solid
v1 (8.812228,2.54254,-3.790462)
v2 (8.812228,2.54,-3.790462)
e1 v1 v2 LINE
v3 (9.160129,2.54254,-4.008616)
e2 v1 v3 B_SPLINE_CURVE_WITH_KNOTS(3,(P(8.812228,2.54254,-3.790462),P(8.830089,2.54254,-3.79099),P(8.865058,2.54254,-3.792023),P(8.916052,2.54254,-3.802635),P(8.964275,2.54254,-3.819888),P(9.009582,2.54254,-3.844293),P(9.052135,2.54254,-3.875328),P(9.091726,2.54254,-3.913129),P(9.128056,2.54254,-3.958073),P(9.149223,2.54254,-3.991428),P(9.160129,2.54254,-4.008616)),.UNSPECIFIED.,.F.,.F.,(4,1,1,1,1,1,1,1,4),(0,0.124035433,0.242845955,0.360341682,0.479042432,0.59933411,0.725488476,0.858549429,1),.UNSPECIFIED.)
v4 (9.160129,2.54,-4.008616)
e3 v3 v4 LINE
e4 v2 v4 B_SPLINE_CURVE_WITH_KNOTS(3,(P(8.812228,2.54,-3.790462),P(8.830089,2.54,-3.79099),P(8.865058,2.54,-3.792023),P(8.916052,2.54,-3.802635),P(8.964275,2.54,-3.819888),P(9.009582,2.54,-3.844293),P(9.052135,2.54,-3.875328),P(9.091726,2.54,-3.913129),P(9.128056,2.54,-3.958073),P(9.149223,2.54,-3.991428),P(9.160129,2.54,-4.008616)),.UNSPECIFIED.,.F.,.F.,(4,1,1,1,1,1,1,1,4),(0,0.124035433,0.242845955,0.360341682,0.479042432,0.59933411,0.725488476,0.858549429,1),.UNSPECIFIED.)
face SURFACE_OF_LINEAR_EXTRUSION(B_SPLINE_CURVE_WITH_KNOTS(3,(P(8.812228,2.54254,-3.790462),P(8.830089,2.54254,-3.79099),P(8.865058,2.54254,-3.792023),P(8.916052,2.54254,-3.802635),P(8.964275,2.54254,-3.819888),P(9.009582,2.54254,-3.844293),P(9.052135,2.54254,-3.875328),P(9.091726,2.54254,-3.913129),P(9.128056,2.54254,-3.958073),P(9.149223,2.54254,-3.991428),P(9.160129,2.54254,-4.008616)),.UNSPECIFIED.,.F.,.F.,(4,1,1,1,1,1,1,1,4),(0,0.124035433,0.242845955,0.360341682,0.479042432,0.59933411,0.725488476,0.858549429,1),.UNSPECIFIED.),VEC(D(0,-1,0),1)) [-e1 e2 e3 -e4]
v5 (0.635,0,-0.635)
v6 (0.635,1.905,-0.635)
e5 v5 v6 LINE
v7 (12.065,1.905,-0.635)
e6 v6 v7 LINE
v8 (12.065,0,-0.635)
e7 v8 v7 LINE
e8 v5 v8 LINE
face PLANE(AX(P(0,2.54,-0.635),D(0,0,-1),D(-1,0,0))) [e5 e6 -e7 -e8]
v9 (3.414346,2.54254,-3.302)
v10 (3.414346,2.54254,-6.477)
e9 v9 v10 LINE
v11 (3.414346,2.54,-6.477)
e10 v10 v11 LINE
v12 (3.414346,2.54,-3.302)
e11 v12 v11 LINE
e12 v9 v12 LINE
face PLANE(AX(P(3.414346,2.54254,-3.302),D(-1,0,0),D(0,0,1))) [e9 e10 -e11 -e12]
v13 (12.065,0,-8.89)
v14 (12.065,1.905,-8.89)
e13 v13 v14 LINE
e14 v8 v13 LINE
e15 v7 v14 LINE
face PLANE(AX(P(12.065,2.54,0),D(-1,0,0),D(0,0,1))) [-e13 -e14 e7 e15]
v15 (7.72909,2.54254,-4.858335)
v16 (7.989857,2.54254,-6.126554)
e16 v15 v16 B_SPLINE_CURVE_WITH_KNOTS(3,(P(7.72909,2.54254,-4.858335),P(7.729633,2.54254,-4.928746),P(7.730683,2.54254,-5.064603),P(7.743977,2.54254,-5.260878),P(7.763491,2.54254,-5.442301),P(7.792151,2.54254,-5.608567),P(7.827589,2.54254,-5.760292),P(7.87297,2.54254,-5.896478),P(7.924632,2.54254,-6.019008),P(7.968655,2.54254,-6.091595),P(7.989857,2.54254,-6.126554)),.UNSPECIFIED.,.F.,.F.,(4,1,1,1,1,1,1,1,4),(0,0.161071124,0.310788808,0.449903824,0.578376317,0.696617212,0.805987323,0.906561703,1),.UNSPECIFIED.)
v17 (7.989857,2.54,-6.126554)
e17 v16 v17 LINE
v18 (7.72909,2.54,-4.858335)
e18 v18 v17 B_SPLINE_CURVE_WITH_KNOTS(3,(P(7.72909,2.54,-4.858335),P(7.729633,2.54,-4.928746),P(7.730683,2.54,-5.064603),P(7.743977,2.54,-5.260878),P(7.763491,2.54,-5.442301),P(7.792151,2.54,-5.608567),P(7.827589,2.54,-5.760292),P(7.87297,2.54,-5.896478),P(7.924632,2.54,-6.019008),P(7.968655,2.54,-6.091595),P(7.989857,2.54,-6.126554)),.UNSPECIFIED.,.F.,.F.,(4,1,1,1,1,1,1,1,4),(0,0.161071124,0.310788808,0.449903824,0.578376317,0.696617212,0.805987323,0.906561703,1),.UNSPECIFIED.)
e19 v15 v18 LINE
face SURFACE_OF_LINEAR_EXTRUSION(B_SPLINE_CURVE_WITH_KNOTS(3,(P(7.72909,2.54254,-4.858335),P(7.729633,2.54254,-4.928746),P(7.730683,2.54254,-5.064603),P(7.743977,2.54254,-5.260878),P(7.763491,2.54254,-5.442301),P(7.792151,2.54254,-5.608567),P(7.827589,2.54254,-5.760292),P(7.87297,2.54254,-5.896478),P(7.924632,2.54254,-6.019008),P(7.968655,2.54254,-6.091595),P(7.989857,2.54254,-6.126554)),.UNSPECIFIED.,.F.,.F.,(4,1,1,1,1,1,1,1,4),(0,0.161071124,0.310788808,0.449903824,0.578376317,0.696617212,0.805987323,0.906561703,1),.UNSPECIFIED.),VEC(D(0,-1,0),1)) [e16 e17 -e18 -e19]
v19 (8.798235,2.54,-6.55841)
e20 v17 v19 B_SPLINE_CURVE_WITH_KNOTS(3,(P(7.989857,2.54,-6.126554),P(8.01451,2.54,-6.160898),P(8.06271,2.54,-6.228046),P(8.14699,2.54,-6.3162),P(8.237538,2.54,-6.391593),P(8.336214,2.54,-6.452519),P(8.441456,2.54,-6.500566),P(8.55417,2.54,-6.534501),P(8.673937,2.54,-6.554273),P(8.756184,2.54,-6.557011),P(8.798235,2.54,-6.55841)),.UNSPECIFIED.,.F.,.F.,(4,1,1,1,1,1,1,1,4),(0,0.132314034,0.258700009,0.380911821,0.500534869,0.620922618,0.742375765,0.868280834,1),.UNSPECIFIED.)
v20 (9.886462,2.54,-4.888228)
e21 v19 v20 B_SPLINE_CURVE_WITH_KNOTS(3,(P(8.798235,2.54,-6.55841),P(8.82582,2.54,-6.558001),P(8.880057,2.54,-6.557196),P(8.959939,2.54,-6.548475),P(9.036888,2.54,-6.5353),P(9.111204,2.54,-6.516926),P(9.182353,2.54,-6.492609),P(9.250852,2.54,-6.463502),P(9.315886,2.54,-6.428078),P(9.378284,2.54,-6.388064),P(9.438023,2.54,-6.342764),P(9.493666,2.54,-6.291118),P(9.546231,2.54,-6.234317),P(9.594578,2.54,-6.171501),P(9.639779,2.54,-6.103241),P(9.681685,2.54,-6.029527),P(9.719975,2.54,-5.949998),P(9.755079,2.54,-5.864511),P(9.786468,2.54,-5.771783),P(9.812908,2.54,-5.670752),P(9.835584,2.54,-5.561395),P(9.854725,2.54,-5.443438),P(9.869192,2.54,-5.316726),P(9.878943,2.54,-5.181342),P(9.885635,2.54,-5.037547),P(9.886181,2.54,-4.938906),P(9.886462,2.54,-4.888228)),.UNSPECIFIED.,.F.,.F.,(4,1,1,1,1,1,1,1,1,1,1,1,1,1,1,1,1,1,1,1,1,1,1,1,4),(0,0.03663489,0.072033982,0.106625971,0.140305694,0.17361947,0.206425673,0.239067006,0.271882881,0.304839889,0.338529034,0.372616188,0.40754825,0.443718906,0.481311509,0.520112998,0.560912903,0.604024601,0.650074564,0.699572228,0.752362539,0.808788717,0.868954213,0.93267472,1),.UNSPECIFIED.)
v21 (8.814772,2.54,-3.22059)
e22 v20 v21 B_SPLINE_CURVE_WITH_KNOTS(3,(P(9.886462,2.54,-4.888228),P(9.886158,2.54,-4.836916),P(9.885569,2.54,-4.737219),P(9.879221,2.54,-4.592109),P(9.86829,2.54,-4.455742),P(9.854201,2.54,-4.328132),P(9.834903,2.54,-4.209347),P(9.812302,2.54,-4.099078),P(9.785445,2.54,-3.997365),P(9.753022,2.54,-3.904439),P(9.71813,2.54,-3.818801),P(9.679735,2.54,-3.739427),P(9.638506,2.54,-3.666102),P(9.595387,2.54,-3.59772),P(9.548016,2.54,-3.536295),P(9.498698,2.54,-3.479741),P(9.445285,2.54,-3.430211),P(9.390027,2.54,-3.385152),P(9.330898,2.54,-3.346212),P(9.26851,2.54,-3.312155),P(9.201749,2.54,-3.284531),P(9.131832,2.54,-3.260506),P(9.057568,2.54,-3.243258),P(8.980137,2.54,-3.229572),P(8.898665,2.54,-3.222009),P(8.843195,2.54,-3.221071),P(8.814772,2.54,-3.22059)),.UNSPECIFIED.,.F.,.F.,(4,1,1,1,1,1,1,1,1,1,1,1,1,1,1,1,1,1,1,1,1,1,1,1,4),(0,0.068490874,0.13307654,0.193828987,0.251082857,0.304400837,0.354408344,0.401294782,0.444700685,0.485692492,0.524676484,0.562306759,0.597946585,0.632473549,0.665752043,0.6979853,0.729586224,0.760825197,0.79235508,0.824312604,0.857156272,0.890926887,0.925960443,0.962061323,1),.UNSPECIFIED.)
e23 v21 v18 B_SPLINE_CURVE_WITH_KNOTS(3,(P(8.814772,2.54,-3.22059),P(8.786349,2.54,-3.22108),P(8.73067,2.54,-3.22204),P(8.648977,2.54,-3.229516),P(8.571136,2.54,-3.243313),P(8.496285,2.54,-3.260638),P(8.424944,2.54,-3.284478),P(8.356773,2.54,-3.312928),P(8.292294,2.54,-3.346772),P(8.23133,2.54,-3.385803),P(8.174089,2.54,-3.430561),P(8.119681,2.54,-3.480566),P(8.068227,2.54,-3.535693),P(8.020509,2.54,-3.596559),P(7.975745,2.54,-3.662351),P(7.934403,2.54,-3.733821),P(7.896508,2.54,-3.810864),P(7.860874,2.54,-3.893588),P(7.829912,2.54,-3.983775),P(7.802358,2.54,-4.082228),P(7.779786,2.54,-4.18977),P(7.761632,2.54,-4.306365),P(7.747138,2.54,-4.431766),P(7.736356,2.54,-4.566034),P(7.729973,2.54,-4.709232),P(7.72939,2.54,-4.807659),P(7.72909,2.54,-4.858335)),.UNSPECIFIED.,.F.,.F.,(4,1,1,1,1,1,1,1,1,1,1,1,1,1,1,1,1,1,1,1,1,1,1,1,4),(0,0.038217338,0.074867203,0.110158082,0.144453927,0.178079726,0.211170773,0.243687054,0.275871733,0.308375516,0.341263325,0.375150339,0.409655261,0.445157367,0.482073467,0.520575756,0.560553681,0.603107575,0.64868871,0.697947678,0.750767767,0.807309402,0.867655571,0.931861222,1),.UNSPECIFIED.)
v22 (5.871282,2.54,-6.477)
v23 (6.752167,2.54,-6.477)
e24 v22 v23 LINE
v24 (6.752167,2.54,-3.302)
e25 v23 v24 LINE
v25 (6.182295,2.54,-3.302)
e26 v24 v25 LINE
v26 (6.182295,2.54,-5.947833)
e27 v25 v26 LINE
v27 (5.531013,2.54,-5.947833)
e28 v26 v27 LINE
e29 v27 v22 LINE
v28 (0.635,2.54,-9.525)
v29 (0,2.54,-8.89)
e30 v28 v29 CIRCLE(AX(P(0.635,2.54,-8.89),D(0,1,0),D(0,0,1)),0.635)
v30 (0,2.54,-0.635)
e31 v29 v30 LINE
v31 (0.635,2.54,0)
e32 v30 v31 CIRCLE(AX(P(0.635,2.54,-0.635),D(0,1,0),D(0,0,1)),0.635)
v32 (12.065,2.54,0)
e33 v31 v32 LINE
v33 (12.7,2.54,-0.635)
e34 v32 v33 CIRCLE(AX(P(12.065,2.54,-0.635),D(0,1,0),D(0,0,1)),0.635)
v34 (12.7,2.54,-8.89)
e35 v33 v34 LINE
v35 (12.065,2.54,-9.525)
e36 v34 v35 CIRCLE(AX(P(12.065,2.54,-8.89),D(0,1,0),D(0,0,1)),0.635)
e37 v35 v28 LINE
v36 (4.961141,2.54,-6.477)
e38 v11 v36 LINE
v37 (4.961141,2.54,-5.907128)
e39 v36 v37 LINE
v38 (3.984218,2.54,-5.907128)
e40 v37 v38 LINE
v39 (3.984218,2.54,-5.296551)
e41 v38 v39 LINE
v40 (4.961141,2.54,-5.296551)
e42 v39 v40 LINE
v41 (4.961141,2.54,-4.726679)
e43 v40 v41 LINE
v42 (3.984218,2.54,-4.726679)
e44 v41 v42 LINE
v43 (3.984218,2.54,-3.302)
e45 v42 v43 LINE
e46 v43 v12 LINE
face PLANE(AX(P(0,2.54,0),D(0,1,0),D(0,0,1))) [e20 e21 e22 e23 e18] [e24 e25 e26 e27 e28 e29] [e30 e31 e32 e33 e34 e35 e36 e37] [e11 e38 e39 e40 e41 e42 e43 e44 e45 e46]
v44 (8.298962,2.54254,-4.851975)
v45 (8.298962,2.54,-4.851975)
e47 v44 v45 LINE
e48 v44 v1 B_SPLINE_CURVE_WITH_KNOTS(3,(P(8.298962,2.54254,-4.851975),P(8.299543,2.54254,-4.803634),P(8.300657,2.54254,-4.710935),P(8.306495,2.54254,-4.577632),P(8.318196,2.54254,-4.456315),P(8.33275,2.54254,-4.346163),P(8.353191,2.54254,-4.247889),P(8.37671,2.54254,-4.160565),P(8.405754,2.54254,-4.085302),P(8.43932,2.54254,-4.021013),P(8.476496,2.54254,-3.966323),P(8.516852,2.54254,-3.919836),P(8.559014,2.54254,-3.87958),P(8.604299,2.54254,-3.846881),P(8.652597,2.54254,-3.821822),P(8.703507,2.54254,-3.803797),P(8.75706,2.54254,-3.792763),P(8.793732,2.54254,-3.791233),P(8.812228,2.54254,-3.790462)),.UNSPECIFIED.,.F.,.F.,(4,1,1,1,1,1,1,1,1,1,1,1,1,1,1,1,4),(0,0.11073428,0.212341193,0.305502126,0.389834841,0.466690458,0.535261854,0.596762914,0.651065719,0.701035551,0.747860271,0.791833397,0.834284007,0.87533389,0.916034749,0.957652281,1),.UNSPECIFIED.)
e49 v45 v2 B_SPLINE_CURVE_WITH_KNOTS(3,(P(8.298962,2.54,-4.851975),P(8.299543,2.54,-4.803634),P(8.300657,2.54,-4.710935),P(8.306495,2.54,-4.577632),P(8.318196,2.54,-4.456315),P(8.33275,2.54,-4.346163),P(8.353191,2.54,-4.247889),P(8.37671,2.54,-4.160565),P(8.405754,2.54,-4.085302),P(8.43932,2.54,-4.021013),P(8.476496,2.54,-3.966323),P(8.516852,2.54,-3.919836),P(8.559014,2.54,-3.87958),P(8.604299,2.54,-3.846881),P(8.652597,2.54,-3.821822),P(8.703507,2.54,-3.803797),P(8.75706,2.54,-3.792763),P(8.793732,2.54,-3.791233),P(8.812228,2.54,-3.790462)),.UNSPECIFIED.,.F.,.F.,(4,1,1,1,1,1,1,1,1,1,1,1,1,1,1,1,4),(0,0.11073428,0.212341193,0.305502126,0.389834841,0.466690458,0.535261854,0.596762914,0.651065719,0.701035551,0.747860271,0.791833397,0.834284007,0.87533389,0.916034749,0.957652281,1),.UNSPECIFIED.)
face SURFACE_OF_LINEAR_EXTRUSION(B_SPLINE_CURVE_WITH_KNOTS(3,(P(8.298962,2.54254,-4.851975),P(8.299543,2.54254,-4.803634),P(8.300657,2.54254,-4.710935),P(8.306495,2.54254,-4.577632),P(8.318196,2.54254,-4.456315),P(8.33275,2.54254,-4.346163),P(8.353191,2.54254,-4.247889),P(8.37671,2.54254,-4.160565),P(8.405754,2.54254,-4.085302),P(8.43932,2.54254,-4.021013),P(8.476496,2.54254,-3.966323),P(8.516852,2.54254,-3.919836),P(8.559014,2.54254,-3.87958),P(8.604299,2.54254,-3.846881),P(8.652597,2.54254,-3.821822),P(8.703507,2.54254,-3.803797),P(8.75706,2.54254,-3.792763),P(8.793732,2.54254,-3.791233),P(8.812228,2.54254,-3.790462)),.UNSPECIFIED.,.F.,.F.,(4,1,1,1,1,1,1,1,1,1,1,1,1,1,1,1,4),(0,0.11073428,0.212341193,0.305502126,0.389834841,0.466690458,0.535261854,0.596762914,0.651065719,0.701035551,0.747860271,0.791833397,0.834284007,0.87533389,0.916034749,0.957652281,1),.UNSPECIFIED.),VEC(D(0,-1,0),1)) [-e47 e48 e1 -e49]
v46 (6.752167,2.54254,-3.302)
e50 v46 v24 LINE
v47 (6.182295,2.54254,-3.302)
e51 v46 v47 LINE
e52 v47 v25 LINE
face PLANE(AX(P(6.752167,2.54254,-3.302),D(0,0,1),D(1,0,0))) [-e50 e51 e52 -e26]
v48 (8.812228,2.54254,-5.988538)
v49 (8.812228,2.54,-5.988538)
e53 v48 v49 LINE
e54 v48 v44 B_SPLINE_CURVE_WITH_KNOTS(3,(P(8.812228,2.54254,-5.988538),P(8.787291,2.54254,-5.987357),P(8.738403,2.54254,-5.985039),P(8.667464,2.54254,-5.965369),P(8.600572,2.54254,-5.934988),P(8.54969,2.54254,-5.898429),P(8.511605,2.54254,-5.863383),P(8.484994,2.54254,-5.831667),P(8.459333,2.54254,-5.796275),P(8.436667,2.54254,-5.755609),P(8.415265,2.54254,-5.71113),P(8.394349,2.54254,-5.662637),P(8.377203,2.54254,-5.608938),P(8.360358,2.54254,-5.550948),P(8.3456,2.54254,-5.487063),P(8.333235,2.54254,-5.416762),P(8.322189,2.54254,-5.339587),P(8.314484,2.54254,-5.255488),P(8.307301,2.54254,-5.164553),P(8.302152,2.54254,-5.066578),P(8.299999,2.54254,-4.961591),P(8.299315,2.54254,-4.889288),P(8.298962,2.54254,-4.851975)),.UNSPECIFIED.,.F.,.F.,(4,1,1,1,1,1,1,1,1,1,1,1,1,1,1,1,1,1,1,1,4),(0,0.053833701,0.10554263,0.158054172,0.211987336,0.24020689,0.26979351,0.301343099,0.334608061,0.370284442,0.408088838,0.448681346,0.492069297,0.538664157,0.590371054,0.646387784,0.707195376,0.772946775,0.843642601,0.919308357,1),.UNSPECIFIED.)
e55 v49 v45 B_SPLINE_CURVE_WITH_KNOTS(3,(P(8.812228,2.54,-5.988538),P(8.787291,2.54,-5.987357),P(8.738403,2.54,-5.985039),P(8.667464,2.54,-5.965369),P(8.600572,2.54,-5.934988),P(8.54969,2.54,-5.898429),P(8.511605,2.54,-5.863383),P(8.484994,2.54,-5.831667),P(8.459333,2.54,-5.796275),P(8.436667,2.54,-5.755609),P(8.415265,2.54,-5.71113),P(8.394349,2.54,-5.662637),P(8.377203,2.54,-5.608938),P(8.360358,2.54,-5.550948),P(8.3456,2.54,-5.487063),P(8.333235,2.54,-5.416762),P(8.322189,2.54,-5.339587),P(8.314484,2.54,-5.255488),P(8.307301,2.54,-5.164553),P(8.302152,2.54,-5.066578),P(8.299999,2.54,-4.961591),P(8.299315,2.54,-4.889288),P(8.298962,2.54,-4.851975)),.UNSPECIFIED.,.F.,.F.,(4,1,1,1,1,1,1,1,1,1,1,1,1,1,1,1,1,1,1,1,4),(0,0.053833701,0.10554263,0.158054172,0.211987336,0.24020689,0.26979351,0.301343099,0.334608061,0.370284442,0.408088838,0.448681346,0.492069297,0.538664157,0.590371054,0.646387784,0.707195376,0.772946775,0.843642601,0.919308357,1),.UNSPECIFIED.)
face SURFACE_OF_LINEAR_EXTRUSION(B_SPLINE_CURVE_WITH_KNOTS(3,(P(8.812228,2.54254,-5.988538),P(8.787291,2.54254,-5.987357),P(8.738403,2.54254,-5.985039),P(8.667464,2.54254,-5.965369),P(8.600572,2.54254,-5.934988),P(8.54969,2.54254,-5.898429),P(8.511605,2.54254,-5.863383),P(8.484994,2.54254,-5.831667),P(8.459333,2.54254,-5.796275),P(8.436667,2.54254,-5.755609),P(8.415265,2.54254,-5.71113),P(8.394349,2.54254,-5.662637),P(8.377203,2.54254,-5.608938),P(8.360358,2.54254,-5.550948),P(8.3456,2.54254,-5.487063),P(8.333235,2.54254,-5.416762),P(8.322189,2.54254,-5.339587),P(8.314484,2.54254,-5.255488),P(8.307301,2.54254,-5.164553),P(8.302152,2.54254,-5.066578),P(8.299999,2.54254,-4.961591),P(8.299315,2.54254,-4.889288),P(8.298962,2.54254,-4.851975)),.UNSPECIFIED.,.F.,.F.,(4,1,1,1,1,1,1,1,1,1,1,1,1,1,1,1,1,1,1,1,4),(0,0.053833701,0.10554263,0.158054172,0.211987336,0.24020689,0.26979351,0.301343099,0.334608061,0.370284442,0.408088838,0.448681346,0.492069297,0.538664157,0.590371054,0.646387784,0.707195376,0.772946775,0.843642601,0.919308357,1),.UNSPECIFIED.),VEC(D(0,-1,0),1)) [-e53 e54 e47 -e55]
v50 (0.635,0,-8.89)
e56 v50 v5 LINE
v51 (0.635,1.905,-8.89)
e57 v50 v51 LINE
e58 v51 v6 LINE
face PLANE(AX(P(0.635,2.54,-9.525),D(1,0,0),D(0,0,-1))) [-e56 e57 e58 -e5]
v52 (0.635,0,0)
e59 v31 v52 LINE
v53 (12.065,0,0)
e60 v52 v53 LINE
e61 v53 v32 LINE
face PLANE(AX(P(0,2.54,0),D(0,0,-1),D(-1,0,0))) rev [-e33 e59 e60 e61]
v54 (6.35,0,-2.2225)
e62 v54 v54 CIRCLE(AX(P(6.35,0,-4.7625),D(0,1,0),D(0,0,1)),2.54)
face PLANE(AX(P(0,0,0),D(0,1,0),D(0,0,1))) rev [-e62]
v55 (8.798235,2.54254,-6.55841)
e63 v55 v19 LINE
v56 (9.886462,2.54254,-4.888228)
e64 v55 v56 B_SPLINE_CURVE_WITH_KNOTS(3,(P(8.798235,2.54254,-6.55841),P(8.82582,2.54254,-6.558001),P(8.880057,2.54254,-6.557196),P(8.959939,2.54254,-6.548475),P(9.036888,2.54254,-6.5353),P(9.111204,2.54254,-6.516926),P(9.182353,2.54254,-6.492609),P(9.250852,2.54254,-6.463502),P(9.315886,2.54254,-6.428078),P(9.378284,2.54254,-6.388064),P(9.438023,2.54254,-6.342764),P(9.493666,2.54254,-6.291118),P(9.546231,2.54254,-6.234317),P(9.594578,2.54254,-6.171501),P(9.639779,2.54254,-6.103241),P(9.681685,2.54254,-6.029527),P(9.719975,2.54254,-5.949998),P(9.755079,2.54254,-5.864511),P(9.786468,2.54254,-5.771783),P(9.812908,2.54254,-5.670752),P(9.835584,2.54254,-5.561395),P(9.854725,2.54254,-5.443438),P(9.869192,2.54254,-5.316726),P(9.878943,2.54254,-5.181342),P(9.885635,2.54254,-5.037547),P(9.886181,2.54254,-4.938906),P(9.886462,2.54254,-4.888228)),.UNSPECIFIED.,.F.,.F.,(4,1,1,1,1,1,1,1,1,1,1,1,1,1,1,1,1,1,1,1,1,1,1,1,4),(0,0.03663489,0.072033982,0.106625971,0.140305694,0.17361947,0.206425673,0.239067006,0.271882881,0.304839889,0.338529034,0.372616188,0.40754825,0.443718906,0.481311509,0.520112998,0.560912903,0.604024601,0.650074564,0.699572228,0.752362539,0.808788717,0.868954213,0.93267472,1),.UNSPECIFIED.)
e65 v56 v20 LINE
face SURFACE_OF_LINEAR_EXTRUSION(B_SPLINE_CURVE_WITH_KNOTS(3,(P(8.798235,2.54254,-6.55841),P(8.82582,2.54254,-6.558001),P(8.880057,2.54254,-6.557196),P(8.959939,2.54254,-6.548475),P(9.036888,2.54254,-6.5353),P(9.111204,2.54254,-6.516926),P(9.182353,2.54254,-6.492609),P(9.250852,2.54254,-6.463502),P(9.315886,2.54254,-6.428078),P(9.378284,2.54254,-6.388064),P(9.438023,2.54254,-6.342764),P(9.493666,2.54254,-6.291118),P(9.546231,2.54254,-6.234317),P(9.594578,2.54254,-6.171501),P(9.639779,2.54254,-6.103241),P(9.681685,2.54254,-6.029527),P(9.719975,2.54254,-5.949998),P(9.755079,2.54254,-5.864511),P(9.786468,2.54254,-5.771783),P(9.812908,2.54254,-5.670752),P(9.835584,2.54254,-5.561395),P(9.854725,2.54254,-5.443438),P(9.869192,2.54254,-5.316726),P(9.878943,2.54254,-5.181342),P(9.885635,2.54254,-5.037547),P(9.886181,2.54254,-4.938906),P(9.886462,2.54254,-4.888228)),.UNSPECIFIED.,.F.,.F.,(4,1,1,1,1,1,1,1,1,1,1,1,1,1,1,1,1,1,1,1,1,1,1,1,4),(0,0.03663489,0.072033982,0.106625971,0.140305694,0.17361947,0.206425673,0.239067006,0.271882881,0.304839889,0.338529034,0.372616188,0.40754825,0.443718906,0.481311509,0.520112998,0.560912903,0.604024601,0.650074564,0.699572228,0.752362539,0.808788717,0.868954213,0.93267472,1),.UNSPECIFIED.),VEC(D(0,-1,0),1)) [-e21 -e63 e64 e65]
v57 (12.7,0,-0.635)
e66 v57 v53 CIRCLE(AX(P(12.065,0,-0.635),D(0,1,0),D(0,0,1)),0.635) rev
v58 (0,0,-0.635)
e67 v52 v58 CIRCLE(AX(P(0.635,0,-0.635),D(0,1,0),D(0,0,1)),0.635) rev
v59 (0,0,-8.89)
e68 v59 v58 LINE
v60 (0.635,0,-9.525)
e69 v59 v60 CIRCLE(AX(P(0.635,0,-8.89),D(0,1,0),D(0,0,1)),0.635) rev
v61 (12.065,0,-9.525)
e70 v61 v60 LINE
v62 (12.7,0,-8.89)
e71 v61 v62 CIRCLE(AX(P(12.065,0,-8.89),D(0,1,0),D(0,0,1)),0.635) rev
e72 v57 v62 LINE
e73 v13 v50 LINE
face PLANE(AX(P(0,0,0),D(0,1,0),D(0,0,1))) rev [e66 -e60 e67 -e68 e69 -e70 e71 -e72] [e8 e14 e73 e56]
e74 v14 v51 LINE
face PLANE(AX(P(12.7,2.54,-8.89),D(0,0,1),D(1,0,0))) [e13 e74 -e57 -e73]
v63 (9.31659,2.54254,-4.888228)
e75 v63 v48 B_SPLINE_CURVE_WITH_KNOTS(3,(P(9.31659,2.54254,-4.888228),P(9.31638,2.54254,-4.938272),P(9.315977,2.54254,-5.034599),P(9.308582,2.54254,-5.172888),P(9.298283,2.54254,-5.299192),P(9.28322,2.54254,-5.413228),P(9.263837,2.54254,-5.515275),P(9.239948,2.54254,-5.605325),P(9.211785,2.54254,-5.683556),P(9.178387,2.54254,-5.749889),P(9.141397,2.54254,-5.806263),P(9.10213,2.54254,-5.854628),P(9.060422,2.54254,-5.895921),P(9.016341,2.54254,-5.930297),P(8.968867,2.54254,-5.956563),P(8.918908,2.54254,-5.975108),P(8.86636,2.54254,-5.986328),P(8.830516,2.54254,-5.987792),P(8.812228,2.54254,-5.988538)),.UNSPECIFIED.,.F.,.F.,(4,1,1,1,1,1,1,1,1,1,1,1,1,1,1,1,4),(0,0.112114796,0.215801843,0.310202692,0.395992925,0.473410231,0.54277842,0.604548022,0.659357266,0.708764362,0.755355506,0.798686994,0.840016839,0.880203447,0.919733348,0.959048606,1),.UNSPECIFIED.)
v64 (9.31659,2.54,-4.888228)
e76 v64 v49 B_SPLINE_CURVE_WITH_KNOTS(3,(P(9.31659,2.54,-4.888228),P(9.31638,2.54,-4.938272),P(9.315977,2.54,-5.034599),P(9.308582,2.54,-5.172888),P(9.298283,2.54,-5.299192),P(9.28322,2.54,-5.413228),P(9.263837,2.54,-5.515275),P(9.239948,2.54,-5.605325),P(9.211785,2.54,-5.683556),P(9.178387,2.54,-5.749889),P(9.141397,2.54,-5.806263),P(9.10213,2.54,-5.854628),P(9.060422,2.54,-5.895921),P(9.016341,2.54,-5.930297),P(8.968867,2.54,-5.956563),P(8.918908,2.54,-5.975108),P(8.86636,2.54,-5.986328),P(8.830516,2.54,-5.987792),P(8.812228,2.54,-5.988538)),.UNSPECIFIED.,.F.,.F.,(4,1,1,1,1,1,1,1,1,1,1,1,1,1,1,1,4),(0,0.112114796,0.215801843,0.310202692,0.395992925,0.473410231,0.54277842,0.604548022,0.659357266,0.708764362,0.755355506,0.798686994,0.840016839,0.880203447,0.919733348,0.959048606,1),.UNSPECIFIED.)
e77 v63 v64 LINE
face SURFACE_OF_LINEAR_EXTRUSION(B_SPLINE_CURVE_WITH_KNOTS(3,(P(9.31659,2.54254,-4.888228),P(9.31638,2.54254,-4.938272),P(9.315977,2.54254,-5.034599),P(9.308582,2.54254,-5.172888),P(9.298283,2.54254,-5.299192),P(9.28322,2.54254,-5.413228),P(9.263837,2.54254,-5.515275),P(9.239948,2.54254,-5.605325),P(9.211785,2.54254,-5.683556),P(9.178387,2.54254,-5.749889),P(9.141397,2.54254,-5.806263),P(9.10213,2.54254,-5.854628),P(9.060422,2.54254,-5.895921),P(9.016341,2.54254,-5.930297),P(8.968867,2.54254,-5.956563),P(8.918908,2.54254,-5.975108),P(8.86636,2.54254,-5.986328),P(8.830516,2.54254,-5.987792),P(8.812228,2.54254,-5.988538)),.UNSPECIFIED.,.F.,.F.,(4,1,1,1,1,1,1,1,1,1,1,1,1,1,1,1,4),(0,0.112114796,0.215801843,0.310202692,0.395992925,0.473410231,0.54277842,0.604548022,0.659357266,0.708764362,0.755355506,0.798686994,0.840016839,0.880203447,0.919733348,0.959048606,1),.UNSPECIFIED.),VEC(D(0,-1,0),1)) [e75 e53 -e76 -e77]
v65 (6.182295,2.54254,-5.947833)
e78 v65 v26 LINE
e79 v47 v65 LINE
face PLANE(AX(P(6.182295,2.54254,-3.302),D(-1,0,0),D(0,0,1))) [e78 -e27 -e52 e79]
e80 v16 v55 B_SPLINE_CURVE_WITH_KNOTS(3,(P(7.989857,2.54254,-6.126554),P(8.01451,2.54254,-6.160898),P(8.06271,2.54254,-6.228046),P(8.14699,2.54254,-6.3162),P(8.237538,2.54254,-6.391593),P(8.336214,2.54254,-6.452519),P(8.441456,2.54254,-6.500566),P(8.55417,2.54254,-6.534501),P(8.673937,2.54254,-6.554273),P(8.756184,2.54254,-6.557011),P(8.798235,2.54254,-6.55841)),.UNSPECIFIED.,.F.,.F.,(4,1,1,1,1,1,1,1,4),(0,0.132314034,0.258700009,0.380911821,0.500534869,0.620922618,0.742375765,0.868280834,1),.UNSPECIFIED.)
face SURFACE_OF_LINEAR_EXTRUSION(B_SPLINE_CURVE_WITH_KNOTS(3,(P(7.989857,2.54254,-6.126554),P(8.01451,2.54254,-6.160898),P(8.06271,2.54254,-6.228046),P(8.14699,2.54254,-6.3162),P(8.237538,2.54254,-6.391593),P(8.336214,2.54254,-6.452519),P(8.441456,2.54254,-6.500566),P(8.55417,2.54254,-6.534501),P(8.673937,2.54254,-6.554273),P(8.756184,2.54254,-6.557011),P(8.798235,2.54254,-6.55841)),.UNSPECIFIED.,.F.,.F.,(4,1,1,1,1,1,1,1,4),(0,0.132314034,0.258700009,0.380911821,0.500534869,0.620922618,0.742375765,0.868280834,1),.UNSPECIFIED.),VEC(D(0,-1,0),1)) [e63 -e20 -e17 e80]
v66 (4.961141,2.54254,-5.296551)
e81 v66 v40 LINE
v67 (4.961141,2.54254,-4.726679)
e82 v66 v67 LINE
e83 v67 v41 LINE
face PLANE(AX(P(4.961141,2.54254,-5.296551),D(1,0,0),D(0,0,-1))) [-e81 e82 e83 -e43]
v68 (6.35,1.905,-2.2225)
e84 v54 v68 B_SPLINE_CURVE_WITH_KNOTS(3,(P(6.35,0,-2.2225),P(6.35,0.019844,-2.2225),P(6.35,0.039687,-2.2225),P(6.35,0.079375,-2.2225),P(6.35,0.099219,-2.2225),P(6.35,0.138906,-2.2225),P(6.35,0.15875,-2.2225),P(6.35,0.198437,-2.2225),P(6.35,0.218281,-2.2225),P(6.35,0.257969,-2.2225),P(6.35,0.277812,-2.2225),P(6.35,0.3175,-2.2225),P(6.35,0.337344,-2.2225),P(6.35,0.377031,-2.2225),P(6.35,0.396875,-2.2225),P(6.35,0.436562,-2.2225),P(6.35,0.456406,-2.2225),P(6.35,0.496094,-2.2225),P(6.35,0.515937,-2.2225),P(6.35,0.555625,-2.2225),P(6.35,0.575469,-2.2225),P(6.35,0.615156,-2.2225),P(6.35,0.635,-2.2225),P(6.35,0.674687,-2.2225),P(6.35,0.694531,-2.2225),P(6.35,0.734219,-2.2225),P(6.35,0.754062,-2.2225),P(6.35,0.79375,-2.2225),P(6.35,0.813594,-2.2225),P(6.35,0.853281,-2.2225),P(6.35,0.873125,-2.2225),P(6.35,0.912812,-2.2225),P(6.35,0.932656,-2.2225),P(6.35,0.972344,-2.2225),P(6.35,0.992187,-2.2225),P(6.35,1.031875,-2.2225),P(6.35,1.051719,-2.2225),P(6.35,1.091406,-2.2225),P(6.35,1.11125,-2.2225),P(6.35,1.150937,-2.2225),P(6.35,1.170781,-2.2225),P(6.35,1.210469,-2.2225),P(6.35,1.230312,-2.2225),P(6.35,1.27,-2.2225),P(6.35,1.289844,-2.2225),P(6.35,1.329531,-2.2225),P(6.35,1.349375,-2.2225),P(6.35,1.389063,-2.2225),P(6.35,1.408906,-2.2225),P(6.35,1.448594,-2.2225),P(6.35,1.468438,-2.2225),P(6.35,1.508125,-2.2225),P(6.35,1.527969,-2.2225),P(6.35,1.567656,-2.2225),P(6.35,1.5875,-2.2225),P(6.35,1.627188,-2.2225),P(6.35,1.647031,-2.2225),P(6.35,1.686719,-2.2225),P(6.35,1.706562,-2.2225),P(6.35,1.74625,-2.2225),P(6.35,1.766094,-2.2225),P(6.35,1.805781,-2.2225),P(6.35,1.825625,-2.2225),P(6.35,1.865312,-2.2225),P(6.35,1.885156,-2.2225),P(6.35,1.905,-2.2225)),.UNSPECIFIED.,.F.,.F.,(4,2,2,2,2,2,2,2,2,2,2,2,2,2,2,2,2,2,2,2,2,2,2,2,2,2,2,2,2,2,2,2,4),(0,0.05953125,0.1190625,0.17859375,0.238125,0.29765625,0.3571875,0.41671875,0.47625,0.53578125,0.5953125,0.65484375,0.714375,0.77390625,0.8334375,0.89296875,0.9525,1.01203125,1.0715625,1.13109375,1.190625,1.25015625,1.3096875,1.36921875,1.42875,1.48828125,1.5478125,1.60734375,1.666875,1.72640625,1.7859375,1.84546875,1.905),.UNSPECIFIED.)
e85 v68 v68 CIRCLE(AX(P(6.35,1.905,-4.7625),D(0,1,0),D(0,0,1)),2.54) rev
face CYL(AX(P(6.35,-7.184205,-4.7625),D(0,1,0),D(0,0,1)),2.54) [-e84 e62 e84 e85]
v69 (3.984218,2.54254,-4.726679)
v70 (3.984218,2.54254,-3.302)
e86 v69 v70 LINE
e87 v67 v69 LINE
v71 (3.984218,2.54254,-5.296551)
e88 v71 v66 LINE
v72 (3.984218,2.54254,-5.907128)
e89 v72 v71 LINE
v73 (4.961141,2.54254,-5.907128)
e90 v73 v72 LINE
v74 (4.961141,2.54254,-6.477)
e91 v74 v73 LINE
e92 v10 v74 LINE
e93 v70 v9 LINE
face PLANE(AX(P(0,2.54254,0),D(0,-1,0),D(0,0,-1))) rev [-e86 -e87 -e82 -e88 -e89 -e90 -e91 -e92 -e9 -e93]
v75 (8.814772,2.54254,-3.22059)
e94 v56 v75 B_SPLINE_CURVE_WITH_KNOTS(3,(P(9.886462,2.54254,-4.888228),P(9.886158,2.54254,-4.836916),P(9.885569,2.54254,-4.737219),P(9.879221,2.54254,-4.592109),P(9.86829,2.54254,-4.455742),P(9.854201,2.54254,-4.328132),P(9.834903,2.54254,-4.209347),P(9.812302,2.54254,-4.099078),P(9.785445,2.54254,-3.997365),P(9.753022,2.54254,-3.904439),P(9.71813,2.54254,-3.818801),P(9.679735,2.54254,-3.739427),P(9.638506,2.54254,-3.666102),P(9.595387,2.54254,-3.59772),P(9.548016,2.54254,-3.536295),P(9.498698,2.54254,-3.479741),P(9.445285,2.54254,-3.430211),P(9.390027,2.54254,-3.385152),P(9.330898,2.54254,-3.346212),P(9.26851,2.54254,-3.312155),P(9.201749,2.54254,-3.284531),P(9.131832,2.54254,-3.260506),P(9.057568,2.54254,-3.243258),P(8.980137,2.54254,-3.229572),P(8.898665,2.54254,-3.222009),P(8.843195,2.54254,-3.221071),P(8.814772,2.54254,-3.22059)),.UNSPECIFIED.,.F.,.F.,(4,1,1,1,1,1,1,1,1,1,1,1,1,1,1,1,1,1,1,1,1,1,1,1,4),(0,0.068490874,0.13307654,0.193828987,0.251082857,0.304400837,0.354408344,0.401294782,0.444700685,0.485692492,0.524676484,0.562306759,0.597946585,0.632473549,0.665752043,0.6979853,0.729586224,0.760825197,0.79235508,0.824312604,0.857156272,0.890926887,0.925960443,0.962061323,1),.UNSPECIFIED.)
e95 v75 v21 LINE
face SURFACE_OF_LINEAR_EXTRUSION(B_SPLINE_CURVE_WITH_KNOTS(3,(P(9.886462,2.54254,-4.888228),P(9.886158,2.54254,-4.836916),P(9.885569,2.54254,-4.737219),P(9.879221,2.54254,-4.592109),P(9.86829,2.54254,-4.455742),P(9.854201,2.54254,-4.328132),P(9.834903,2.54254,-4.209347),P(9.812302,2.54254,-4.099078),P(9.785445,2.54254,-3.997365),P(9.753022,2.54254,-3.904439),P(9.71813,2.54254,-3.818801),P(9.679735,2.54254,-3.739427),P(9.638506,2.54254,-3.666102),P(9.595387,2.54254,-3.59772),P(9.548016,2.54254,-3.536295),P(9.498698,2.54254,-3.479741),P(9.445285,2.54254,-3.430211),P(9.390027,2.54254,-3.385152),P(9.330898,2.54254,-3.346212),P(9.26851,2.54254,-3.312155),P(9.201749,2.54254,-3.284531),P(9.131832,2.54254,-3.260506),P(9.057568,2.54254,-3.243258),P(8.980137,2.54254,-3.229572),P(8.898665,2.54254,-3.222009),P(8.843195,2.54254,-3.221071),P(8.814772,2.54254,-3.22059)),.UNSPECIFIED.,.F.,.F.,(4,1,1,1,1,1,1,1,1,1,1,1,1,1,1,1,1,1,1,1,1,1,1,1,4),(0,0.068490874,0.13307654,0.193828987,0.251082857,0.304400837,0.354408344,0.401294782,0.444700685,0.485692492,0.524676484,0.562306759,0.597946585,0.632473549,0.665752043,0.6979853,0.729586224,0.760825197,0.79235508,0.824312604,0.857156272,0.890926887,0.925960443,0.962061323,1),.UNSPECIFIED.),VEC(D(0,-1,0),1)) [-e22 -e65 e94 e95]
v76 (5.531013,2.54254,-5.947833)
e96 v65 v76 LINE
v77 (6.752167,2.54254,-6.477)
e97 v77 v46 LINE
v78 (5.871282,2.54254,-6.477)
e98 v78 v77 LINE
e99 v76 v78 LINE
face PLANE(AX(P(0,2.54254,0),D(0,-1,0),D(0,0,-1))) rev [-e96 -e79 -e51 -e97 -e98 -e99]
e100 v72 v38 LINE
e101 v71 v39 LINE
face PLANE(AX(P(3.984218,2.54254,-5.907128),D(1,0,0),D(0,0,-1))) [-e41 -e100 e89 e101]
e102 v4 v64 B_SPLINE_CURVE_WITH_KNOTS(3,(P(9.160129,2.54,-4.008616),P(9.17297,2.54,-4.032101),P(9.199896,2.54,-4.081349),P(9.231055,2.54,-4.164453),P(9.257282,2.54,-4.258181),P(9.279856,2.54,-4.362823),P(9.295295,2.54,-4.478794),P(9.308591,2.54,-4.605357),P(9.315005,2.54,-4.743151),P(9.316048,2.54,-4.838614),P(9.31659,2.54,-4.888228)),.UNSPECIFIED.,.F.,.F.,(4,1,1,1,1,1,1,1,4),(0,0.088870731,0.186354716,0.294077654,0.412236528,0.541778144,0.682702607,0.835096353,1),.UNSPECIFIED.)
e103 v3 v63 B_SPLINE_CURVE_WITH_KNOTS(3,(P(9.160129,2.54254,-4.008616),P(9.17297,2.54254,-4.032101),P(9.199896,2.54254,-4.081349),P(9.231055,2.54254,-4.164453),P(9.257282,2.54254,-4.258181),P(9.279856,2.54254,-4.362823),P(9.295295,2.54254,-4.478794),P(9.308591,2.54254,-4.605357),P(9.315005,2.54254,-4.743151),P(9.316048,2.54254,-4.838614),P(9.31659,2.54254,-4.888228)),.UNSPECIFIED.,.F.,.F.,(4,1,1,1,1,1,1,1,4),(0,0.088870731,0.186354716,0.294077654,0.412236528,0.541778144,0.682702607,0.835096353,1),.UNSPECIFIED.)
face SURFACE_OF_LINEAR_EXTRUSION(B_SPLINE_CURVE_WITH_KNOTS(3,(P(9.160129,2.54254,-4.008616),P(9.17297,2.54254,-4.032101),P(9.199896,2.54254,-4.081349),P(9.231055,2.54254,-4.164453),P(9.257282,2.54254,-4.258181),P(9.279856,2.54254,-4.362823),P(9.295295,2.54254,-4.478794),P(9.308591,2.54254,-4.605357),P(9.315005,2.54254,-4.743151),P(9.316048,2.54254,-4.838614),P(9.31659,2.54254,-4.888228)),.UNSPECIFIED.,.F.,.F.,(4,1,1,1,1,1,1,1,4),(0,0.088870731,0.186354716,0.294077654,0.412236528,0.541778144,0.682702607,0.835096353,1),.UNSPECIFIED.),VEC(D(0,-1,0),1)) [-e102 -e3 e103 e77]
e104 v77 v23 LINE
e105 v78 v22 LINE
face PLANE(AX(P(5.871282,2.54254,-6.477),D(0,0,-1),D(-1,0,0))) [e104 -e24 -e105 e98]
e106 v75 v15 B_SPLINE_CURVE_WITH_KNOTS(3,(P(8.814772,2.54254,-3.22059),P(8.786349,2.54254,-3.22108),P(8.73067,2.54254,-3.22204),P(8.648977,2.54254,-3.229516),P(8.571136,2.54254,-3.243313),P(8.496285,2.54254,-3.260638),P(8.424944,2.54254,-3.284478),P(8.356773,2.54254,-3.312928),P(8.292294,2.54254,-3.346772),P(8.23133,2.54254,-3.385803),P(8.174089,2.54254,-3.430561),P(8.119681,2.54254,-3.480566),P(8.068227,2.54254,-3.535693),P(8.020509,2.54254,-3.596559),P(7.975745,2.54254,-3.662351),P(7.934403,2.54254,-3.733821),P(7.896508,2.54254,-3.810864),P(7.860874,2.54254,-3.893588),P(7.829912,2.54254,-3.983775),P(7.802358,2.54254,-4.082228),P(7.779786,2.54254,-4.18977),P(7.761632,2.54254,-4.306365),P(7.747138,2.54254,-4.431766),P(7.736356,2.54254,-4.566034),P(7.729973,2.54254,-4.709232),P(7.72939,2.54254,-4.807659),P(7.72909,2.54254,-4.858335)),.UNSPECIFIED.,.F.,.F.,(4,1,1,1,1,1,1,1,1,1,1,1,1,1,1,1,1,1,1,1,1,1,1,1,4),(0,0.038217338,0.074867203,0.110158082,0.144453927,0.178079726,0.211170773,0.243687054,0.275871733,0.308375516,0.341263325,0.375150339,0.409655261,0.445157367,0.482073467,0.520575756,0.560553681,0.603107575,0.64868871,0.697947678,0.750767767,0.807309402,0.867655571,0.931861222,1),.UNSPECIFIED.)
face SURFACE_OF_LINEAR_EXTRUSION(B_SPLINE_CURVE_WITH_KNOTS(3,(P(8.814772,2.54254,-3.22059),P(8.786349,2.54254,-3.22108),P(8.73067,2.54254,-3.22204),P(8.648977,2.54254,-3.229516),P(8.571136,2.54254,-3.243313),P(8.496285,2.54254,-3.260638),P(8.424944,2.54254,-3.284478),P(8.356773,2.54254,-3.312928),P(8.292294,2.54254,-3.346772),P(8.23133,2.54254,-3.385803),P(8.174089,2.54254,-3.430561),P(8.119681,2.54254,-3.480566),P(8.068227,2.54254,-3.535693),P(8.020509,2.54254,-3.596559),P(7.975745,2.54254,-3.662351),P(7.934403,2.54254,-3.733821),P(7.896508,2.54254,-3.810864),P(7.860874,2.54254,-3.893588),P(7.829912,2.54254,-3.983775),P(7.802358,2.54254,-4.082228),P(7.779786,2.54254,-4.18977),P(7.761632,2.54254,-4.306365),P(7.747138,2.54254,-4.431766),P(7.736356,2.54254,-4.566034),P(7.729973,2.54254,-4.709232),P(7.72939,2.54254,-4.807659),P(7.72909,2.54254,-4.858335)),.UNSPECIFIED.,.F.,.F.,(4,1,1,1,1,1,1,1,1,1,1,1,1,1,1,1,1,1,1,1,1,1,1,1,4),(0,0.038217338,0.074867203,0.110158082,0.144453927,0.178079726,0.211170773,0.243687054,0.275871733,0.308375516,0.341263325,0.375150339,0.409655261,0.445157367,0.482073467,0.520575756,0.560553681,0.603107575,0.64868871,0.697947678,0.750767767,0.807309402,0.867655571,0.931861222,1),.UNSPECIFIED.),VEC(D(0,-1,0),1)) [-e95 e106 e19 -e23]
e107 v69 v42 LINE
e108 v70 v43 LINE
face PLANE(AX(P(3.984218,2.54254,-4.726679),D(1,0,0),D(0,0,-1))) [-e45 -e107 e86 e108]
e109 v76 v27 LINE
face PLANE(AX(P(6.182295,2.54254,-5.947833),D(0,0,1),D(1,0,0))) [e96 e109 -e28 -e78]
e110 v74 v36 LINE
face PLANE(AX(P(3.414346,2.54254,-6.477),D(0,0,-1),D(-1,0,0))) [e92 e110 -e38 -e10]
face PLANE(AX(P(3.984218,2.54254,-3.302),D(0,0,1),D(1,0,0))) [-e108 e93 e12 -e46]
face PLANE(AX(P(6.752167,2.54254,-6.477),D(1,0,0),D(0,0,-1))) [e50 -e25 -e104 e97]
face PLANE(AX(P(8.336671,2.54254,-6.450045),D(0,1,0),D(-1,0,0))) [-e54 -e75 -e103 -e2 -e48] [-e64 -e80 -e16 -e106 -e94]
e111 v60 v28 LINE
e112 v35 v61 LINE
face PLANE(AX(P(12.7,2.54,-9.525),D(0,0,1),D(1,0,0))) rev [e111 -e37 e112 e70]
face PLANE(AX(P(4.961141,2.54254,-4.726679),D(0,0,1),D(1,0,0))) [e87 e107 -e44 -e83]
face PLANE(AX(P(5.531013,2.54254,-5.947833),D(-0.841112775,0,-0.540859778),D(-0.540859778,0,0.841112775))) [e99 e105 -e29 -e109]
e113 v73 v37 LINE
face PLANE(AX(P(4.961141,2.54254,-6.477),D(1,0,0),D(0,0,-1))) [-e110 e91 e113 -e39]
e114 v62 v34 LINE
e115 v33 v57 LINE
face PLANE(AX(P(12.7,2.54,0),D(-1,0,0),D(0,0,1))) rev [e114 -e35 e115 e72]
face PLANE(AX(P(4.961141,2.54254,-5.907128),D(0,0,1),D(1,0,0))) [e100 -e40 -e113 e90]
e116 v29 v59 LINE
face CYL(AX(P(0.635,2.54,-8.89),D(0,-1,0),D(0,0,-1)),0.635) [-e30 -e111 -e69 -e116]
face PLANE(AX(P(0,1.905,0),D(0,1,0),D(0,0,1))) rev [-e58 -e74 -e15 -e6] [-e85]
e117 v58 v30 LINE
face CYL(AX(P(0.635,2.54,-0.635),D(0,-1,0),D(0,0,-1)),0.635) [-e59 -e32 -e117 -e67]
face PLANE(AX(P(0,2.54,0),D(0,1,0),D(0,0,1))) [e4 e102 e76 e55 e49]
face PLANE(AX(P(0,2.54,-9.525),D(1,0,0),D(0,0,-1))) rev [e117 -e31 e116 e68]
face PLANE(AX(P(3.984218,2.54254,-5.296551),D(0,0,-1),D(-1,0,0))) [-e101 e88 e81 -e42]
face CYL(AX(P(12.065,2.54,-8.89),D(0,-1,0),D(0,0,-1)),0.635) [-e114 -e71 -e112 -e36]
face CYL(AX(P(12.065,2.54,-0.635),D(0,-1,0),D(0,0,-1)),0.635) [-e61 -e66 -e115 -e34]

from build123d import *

# Parameters (mm, degrees)
SKETCH1_W           = 12.7
SKETCH1_H           = 9.525
BOSS_EXTRUDE1_DEPTH = 2.54
FILLET1_R           = 0.635
SHELL1_START        = 0.635
SHELL1_OUTLINE_W    = 1.905
SHELL1_OUTLINE_H    = 8.255
SHELL1_DEPTH        = 11.43
SKETCH2_R           = 2.54
BOSS_EXTRUDE2_DEPTH = 1.905
BOSS_EXTRUDE3_DEPTH = 0.00254


# Read off the part's stored shape, not the designer's step: Shell1
with BuildPart() as part:
    # Sketch1 → Boss-Extrude1 (new body)
    with BuildSketch(Plane(origin=(0, 0, 0), x_dir=(1, 0, 0), z_dir=(0, 1, 0))):
        with Locations((6.35, 4.7625)):
            Rectangle(SKETCH1_W, SKETCH1_H)
    extrude(amount=BOSS_EXTRUDE1_DEPTH)

    # Fillet1
    fillet1_edges = [part.edges().sort_by_distance(p)[0] for p in [
        (0, 1.27, -9.525),
        (12.7, 1.27, -9.525),
        (12.7, 1.27, 0),
        (0, 1.27, 0),
    ]]
    fillet(fillet1_edges, radius=FILLET1_R)

    # Shell1 outline → Shell1 (cut)
    with BuildSketch(Plane.YZ.offset(SHELL1_START)):
        with Locations((0.9525, -4.7625)):
            Rectangle(SHELL1_OUTLINE_W, SHELL1_OUTLINE_H)
    extrude(amount=SHELL1_DEPTH, mode=Mode.SUBTRACT)

    # Sketch2 → Boss-Extrude2 (add)
    with BuildSketch(Plane(origin=(0, 1.905, 0), x_dir=(-1, 0, 0), z_dir=(0, -1, 0))):
        with Locations(Location((-6.35, 4.7625, 0), (0, 0, 270))):
            Circle(SKETCH2_R)
    extrude(amount=BOSS_EXTRUDE2_DEPTH)

    # Sketch3 → Boss-Extrude3 (add)
    # profile 1 of 3: a face of its own
    with BuildSketch(Plane(origin=(0, 2.54, 0), x_dir=(1, 0, 0), z_dir=(0, 1, 0))):
        Polygon((3.414346154, 6.477), (4.961141026, 6.477), (4.961141026, 5.907128205), (3.984217949, 5.907128205), (3.984217949, 5.296551282), (4.961141026, 5.296551282), (4.961141026, 4.726679487), (3.984217949, 4.726679487), (3.984217949, 3.302), (3.414346154, 3.302), align=None)
    # profile 2 of 3: a face of its own
    with BuildSketch(Plane(origin=(0, 2.54, 0), x_dir=(1, 0, 0), z_dir=(0, 1, 0))):
        Polygon((5.871282252, 6.477), (6.752166667, 6.477), (6.752166667, 3.302), (6.182294872, 3.302), (6.182294872, 5.947833333), (5.531012821, 5.947833333), align=None)
    # profile 3 of 3: a face of its own
    with BuildSketch(Plane(origin=(0, 2.54, 0), x_dir=(1, 0, 0), z_dir=(0, 1, 0))):
        with BuildLine():
            add(Edge.make_bspline(
                [(8.798235377, 6.558410256), (8.825819537, 6.558000762), (8.880057365, 6.557195586), (8.959939478, 6.548474876), (9.036888038, 6.535300314), (9.111204078, 6.516926396), (9.182352664, 6.492609168), (9.25085163, 6.463501864), (9.31588564, 6.428077745), (9.378284086, 6.388064384), (9.438022931, 6.342763586), (9.493666394, 6.291118337), (9.546230643, 6.234316997), (9.594577855, 6.171500832), (9.639778695, 6.10324122), (9.68168464, 6.029527338), (9.719974889, 5.949998406), (9.755078585, 5.864510908), (9.786468421, 5.771783423), (9.812908041, 5.670752326), (9.83558444, 5.561394546), (9.85472492, 5.443437874), (9.869192029, 5.316725518), (9.878943152, 5.181341659), (9.885634834, 5.037547297), (9.886180963, 4.938905546), (9.886461538, 4.888227965)],
                knots=[0, 0, 0, 0, 0.879237366, 1.728815576, 2.559023295, 3.367336655, 4.166867292, 4.954216142, 5.737608147, 6.525189134, 7.316157332, 8.124696809, 8.942788509, 9.781158001, 10.649253743, 11.551476218, 12.482711956, 13.461909668, 14.496590415, 15.601789533, 16.789733467, 18.056700938, 19.410929216, 20.8549011, 22.384193279, 24, 24, 24, 24], degree=3))
            add(Edge.make_bspline(
                [(9.886461538, 4.888227965), (9.886158312, 4.83691635), (9.885569149, 4.737218804), (9.879221327, 4.592109226), (9.86829008, 4.455742398), (9.854201098, 4.32813243), (9.834903048, 4.20934671), (9.812302348, 4.099077662), (9.785445387, 3.997365257), (9.75302158, 3.904438674), (9.718130367, 3.818801041), (9.679735377, 3.739427172), (9.63850583, 3.666102077), (9.595387407, 3.59771955), (9.548016197, 3.53629547), (9.498697891, 3.4797411), (9.445285081, 3.430210667), (9.390026654, 3.385151595), (9.330898269, 3.346211514), (9.268509703, 3.312155161), (9.201748675, 3.284531414), (9.131832125, 3.260505754), (9.057568312, 3.243257923), (8.980137277, 3.229572336), (8.89866484, 3.222008841), (8.843195123, 3.221070539), (8.814771835, 3.220589744)],
                knots=[0, 0, 0, 0, 1.643780988, 3.193836972, 4.651895693, 6.025988579, 7.305620092, 8.505800249, 9.631074763, 10.672816429, 11.65661981, 12.592235626, 13.49536222, 14.350718032, 15.179365177, 15.97804903, 16.751647189, 17.51006938, 18.259804725, 19.016521909, 19.783502495, 20.571750527, 21.382245291, 22.22305063, 23.089471752, 24, 24, 24, 24], degree=3))
            add(Edge.make_bspline(
                [(8.814771835, 3.220589744), (8.786349314, 3.221079814), (8.730670013, 3.222039854), (8.648977266, 3.229516098), (8.571135886, 3.243313364), (8.496284527, 3.26063817), (8.424944142, 3.284478255), (8.356772657, 3.312928485), (8.292294252, 3.346772343), (8.231330396, 3.38580315), (8.174089237, 3.430560743), (8.119681247, 3.480566389), (8.068226781, 3.535693336), (8.020508587, 3.596559051), (7.975745182, 3.662351105), (7.934403375, 3.733820811), (7.896508012, 3.810864109), (7.86087372, 3.893588392), (7.82991203, 3.983774617), (7.802357564, 4.082228137), (7.779785671, 4.189769642), (7.761631843, 4.306364584), (7.747137838, 4.431765951), (7.736355964, 4.566034271), (7.729972884, 4.709232083), (7.729389899, 4.807659072), (7.729089744, 4.858335136)],
                knots=[0, 0, 0, 0, 0.917216111, 1.796812873, 2.643793957, 3.46689424, 4.273913431, 5.068098542, 5.848489301, 6.620921603, 7.401012384, 8.190319798, 9.003608147, 9.831726257, 10.68377682, 11.569763213, 12.493818149, 13.453288342, 14.474581811, 15.568529029, 16.750744269, 18.018426408, 19.375425659, 20.823733699, 22.36466933, 24, 24, 24, 24], degree=3))
            add(Edge.make_bspline(
                [(7.729089744, 4.858335136), (7.729633447, 4.928745538), (7.730682529, 5.064603314), (7.74397727, 5.2608783), (7.763490579, 5.442300526), (7.792151006, 5.608566515), (7.827589229, 5.760292069), (7.872969718, 5.896477699), (7.924632103, 6.019007839), (7.968655093, 6.091595432), (7.989856971, 6.126554287)],
                knots=[0, 0, 0, 0, 1.288568992, 2.486310467, 3.599230591, 4.627010532, 5.572937695, 6.447898582, 7.252493626, 8, 8, 8, 8], degree=3))
            add(Edge.make_bspline(
                [(7.989856971, 6.126554287), (8.014509505, 6.160897855), (8.062710067, 6.228046298), (8.146990098, 6.316199652), (8.237538017, 6.391592717), (8.336213628, 6.452519281), (8.441456335, 6.500565973), (8.5541697, 6.534500812), (8.673937491, 6.554272829), (8.756184031, 6.557010519), (8.798235377, 6.558410256)],
                knots=[0, 0, 0, 0, 1.058512271, 2.069600068, 3.047294572, 4.004278952, 4.967380941, 5.939006123, 6.946246673, 8, 8, 8, 8], degree=3))
        make_face()
        with BuildLine():
            add(Edge.make_bspline(
                [(8.812227764, 5.988538462), (8.787291455, 5.98735653), (8.738403051, 5.985039317), (8.667463648, 5.965369447), (8.600572221, 5.934988272), (8.549689698, 5.898429277), (8.511604636, 5.863383097), (8.48499433, 5.831667444), (8.459332884, 5.796275061), (8.436667403, 5.755608871), (8.415265272, 5.711130059), (8.394348939, 5.662636719), (8.377203038, 5.608937747), (8.360357645, 5.550947646), (8.345599509, 5.487063142), (8.333235426, 5.41676205), (8.322189206, 5.339587196), (8.314484335, 5.25548803), (8.307301083, 5.164552541), (8.302151788, 5.06657816), (8.299998997, 4.961591317), (8.29931469, 4.889288437), (8.298961538, 4.85197496)],
                knots=[0, 0, 0, 0, 1.076674018, 2.110852608, 3.161083442, 4.239746716, 4.804137807, 5.395870207, 6.026861976, 6.692161227, 7.405688833, 8.16177676, 8.973626916, 9.841385931, 10.773283133, 11.807421078, 12.927755683, 14.143907515, 15.458935494, 16.872852025, 18.386167141, 20, 20, 20, 20], degree=3))
            add(Edge.make_bspline(
                [(8.298961538, 4.85197496), (8.299542783, 4.803633547), (8.300657362, 4.710935302), (8.306495007, 4.577631999), (8.318196082, 4.45631526), (8.332749856, 4.346162875), (8.353191227, 4.247889213), (8.376710347, 4.160564514), (8.405754369, 4.085301955), (8.439320333, 4.02101307), (8.476496151, 3.96632265), (8.516852136, 3.919835547), (8.559014312, 3.879579908), (8.604298698, 3.846880749), (8.652597258, 3.821821621), (8.70350679, 3.803796899), (8.757059643, 3.792763217), (8.793732086, 3.7912332), (8.812227764, 3.790461538)],
                knots=[0, 0, 0, 0, 1.771748488, 3.397459088, 4.888034009, 6.237357457, 7.467047327, 8.564189669, 9.548206622, 10.417051504, 11.216568818, 11.965764335, 12.669334354, 13.348544111, 14.005342236, 14.656555988, 15.322436492, 16, 16, 16, 16], degree=3))
            add(Edge.make_bspline(
                [(8.812227764, 3.790461538), (8.83008873, 3.790989566), (8.86505828, 3.79202338), (8.916051715, 3.802635332), (8.96427473, 3.819888063), (9.009581726, 3.844293261), (9.052134759, 3.875328205), (9.091725856, 3.913129275), (9.128056429, 3.95807326), (9.149222786, 3.991428344), (9.160129407, 4.008615585)],
                knots=[0, 0, 0, 0, 0.992283464, 1.942767638, 2.88273346, 3.832339453, 4.79467288, 5.803907806, 6.868395428, 8, 8, 8, 8], degree=3))
            add(Edge.make_bspline(
                [(9.160129407, 4.008615585), (9.172970117, 4.0321014), (9.199896044, 4.08134925), (9.231054773, 4.164453161), (9.257282455, 4.258180636), (9.279856237, 4.362823366), (9.295295327, 4.478794074), (9.308591452, 4.60535738), (9.315004504, 4.743150605), (9.316047621, 4.838614248), (9.316589744, 4.888227965)],
                knots=[0, 0, 0, 0, 0.710965849, 1.490837728, 2.352621235, 3.297892224, 4.334225155, 5.461620853, 6.680770821, 8, 8, 8, 8], degree=3))
            add(Edge.make_bspline(
                [(9.316589744, 4.888227965), (9.316380334, 4.938272352), (9.315977255, 5.034599256), (9.30858193, 5.172887857), (9.298283374, 5.299191543), (9.283219561, 5.41322833), (9.263837227, 5.515275048), (9.239948427, 5.605325026), (9.211785309, 5.683555737), (9.178387208, 5.749889172), (9.141396735, 5.806263493), (9.10213022, 5.854628288), (9.060421626, 5.895920929), (9.016340704, 5.930296808), (8.968867186, 5.956562559), (8.918907879, 5.975108351), (8.866360361, 5.986327934), (8.830515514, 5.987791673), (8.812227764, 5.988538462)],
                knots=[0, 0, 0, 0, 1.793836731, 3.452829483, 4.963243077, 6.335886805, 7.574563692, 8.684454726, 9.672768357, 10.54971625, 11.340229787, 12.085688095, 12.778991901, 13.440269426, 14.083255152, 14.715733572, 15.344777694, 16, 16, 16, 16], degree=3))
        make_face(mode=Mode.SUBTRACT)
    extrude(amount=BOSS_EXTRUDE3_DEPTH)


solid = part.part
